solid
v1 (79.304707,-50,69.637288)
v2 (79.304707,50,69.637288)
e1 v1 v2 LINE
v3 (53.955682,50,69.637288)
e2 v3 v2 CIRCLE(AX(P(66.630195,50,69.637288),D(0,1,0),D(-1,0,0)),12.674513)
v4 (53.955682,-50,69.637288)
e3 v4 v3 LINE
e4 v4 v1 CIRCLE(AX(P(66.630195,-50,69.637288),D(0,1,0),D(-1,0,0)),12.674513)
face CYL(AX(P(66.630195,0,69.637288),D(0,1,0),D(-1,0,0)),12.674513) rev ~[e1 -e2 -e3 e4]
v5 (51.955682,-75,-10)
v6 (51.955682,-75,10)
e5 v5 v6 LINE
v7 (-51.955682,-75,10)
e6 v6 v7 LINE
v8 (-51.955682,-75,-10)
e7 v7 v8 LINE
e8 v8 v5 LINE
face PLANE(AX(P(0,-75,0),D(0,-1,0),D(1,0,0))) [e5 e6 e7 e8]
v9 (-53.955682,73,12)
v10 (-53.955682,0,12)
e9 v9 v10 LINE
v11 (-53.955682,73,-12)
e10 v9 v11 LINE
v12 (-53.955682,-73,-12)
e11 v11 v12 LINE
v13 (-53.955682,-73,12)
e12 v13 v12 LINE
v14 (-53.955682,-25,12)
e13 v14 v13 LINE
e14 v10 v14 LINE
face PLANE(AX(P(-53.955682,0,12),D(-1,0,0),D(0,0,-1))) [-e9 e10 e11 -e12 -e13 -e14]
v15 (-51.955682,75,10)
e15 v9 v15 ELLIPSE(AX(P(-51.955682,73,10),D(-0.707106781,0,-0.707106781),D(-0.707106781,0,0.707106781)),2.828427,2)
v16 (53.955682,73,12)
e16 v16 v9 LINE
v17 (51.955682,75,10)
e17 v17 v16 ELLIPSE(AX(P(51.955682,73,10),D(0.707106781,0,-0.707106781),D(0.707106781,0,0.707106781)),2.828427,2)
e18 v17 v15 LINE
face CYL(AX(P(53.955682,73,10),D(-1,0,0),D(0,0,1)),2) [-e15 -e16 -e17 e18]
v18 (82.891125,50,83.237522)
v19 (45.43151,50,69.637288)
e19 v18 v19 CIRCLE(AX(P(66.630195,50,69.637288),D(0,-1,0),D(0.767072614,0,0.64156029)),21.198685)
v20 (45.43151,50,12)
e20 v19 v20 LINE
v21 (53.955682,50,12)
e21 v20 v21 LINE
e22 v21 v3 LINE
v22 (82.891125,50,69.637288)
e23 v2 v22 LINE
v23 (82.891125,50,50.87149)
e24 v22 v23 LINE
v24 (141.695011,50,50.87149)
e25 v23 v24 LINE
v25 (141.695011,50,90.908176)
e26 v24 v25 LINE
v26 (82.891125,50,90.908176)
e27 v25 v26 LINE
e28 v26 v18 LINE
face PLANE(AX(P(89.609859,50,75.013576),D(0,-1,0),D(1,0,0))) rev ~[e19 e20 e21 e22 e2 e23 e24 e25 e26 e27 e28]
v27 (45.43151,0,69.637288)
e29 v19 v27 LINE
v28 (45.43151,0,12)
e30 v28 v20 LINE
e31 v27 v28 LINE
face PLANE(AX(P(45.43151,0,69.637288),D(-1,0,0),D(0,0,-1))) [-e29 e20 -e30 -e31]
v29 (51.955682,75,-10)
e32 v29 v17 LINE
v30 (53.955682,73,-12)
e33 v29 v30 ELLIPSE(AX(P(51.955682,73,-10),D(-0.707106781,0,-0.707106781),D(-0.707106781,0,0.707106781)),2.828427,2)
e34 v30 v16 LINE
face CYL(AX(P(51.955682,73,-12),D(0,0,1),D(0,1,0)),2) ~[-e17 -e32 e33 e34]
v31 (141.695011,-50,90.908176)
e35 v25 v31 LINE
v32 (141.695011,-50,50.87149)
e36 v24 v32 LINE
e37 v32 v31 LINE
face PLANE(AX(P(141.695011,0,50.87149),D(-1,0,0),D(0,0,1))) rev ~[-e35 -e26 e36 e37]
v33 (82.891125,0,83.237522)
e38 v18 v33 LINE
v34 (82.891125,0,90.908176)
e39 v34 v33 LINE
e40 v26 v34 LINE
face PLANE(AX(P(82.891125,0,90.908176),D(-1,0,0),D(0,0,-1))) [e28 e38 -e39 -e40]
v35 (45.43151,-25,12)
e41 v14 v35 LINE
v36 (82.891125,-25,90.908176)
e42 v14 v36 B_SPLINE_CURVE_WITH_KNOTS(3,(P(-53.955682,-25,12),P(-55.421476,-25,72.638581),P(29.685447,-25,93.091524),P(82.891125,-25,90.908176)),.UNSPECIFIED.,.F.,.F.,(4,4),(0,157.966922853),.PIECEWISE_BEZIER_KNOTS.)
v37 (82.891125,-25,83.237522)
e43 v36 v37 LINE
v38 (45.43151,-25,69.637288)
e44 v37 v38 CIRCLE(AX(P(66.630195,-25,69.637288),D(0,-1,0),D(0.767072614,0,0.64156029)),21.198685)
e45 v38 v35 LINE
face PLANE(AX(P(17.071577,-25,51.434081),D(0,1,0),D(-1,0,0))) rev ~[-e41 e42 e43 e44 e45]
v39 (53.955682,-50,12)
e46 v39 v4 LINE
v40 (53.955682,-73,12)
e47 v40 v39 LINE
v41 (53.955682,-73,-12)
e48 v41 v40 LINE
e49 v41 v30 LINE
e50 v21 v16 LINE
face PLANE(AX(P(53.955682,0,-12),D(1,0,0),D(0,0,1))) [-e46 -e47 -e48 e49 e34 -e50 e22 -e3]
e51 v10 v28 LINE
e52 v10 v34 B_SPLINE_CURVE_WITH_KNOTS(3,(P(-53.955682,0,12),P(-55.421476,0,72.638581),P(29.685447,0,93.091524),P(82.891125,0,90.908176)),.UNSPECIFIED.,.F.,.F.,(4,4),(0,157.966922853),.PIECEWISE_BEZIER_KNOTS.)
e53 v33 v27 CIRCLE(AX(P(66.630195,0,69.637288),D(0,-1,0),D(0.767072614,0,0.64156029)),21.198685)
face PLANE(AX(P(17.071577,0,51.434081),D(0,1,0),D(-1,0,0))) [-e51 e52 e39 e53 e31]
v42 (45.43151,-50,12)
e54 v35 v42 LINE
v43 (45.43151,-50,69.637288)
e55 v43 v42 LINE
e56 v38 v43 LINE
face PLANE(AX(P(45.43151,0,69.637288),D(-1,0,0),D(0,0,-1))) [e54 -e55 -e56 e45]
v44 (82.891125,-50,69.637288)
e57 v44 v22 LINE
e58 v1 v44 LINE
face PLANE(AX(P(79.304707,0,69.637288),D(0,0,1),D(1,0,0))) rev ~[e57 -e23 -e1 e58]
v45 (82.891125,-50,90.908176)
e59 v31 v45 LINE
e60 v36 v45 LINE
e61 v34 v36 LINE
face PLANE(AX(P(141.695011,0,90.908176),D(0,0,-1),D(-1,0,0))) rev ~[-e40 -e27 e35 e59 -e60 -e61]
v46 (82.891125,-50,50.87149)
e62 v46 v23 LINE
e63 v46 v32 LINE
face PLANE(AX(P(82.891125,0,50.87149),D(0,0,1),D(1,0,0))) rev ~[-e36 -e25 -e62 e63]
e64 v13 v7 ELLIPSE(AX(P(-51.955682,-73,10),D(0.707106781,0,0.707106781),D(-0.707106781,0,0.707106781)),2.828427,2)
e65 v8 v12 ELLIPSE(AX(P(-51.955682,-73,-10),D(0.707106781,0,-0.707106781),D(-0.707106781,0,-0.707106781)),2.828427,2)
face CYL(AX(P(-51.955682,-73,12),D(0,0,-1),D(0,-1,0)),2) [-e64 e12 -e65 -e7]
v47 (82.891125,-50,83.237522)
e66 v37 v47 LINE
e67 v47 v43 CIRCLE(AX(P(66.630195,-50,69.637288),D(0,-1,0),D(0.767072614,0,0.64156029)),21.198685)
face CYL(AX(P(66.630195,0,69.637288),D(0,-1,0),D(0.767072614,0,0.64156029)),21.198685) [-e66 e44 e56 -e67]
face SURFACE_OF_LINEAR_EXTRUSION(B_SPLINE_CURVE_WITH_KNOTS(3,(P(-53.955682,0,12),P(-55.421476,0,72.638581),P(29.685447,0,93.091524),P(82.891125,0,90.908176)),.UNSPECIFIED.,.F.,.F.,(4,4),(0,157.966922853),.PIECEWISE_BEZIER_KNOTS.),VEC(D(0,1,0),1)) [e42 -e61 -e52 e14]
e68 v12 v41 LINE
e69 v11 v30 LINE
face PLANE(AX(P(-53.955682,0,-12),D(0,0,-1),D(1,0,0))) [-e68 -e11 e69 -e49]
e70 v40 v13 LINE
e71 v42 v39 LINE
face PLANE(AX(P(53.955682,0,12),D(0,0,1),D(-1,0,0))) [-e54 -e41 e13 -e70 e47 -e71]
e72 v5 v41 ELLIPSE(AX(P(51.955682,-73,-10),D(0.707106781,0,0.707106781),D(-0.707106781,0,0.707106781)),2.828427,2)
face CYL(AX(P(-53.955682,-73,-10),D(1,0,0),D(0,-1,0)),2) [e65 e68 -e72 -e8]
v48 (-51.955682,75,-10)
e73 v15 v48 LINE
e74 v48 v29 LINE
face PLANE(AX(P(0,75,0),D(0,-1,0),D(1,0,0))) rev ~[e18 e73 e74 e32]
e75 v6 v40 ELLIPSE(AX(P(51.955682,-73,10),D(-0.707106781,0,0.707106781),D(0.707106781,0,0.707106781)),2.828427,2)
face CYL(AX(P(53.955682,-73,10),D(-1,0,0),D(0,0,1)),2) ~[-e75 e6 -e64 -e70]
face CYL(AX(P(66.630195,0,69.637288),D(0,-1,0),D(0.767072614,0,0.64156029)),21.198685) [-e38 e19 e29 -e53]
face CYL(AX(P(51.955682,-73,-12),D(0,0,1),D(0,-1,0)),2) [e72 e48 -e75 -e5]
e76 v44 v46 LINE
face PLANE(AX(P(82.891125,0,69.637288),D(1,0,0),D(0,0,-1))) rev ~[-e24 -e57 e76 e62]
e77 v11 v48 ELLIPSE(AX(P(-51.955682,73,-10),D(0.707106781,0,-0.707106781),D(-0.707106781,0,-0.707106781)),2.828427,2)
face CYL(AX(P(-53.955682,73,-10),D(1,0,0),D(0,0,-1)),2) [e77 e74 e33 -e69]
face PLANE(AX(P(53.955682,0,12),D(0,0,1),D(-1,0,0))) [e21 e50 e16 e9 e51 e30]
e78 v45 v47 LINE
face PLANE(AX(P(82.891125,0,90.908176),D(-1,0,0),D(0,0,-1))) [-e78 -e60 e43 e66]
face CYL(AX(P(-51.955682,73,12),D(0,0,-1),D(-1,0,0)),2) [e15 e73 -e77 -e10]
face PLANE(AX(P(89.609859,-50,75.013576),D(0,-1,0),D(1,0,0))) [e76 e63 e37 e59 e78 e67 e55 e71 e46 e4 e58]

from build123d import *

# Parameters (mm, degrees)
F2_DEPTH = 50
F3_DEPTH = 25
F4_DEPTH = 25
F6_DEPTH = 75
F7_R     = 2


# Not quite as in the source:
# - the program builds the solid bodies; features that only make, move or delete a surface that nothing else refers to are left out


with BuildPart() as f2:
    # F0 (on Front) → F2 (new body, symmetric)
    with BuildSketch(Plane.XZ):
        with BuildLine():
            ThreePointArc((86.0395411487, 78.1614595205), (84.6450154703, 80.8109382584), (82.8911252312, 83.2375219638))
            Line((82.8911252312, 83.2375219638), (82.8911252312, 69.6372875124))
            Line((82.8911252312, 69.6372875124), (98.3350202441, 69.6372875124))
            Line((98.3350202441, 69.6372875124), (98.3350202441, 78.1614595205))
            Line((98.3350202441, 78.1614595205), (86.0395411487, 78.1614595205))
        make_face()
        with BuildLine():
            Line((141.6950114063, 90.9081755561), (82.8911252312, 90.9081755561))
            Line((82.8911252312, 90.9081755561), (82.8911252312, 83.2375219638))
            ThreePointArc((82.8911252312, 83.2375219638), (84.6450154703, 80.8109382584), (86.0395411487, 78.1614595205))
            Line((86.0395411487, 78.1614595205), (98.3350202441, 78.1614595205))
            Line((98.3350202441, 78.1614595205), (98.3350202441, 69.6372875124))
            Line((98.3350202441, 69.6372875124), (82.8911252312, 69.6372875124))
            Line((82.8911252312, 69.6372875124), (82.8911252312, 50.8714897913))
            Line((82.8911252312, 50.8714897913), (141.6950114063, 50.8714897913))
            Line((141.6950114063, 50.8714897913), (141.6950114063, 90.9081755561))
        make_face()
        with BuildLine():
            Line((45.431509614, 69.6372875124), (45.431509614, 12))
            Line((45.431509614, 12), (53.955681622, 12))
            Line((53.955681622, 12), (53.955681622, 69.6372875124))
            ThreePointArc((53.955681622, 69.6372875124), (66.6301945598, 82.3118004502), (79.3047074976, 69.6372875124))
            Line((79.3047074976, 69.6372875124), (82.8911252312, 69.6372875124))
            Line((82.8911252312, 69.6372875124), (82.8911252312, 83.2375219638))
            ThreePointArc((82.8911252312, 83.2375219638), (59.3957665519, 89.563333152), (45.431509614, 69.6372875124))
        make_face()
    extrude(amount=F2_DEPTH, both=True)

    # F0 (on Front) → F3 (join)
    with BuildSketch(Plane.XZ):
        with BuildLine():
            add(Edge.make_bspline(
                [(-53.955681622, 12), (-55.4214757867, 72.6385811269), (29.6854469925, 93.0915244818), (82.8911252312, 90.9081755561)],
                knots=[0, 0, 0, 0, 157.9669228526, 157.9669228526, 157.9669228526, 157.9669228526], degree=3))
            Line((-53.955681622, 12), (45.431509614, 12))
            Line((45.431509614, 12), (45.431509614, 69.6372875124))
            ThreePointArc((45.431509614, 69.6372875124), (59.3957665519, 89.563333152), (82.8911252312, 83.2375219638))
            Line((82.8911252312, 83.2375219638), (82.8911252312, 90.9081755561))
        make_face()
        Polygon((45.431509614, 12), (-53.955681622, 12), (-53.955681622, -12), (53.955681622, -12), (53.955681622, 12), align=None)
        with BuildLine():
            Line((45.431509614, 69.6372875124), (45.431509614, 12))
            Line((45.431509614, 12), (53.955681622, 12))
            Line((53.955681622, 12), (53.955681622, 69.6372875124))
            ThreePointArc((53.955681622, 69.6372875124), (66.6301945598, 82.3118004502), (79.3047074976, 69.6372875124))
            Line((79.3047074976, 69.6372875124), (82.8911252312, 69.6372875124))
            Line((82.8911252312, 69.6372875124), (82.8911252312, 83.2375219638))
            ThreePointArc((82.8911252312, 83.2375219638), (59.3957665519, 89.563333152), (45.431509614, 69.6372875124))
        make_face()
        with BuildLine():
            Line((141.6950114063, 90.9081755561), (82.8911252312, 90.9081755561))
            Line((82.8911252312, 90.9081755561), (82.8911252312, 83.2375219638))
            ThreePointArc((82.8911252312, 83.2375219638), (84.6450154703, 80.8109382584), (86.0395411487, 78.1614595205))
            Line((86.0395411487, 78.1614595205), (98.3350202441, 78.1614595205))
            Line((98.3350202441, 78.1614595205), (98.3350202441, 69.6372875124))
            Line((98.3350202441, 69.6372875124), (82.8911252312, 69.6372875124))
            Line((82.8911252312, 69.6372875124), (82.8911252312, 50.8714897913))
            Line((82.8911252312, 50.8714897913), (141.6950114063, 50.8714897913))
            Line((141.6950114063, 50.8714897913), (141.6950114063, 90.9081755561))
        make_face()
        with BuildLine():
            ThreePointArc((86.0395411487, 78.1614595205), (84.6450154703, 80.8109382584), (82.8911252312, 83.2375219638))
            Line((82.8911252312, 83.2375219638), (82.8911252312, 69.6372875124))
            Line((82.8911252312, 69.6372875124), (98.3350202441, 69.6372875124))
            Line((98.3350202441, 69.6372875124), (98.3350202441, 78.1614595205))
            Line((98.3350202441, 78.1614595205), (86.0395411487, 78.1614595205))
        make_face()
    extrude(amount=F3_DEPTH)

    # F0 (on Front) → F4 (join, symmetric)
    with BuildSketch(Plane.XZ):
        Polygon((45.431509614, 12), (-53.955681622, 12), (-53.955681622, -12), (53.955681622, -12), (53.955681622, 12), align=None)
    extrude(amount=F4_DEPTH, both=True)

    # F1 (on face) → F6 (join, symmetric)
    with BuildSketch(Plane.XZ):
        Polygon((53.955681622, 12), (45.431509614, 12), (-53.955681622, 12), (-53.955681622, -12), (53.955681622, -12), align=None)
    extrude(amount=F6_DEPTH, both=True)

    # F7
    f7_edges = [f2.edges().sort_by_distance(p)[0] for p in [
        (53.955682, -75, 0),
        (0, -75, 12),
        (-53.955682, -75, 0),
        (0, -75, -12),
        (53.955682, 75, 0),
        (0, 75, 12),
        (-53.955682, 75, 0),
        (0, 75, -12),
    ]]
    fillet(f7_edges, radius=F7_R)


solid = f2.part
